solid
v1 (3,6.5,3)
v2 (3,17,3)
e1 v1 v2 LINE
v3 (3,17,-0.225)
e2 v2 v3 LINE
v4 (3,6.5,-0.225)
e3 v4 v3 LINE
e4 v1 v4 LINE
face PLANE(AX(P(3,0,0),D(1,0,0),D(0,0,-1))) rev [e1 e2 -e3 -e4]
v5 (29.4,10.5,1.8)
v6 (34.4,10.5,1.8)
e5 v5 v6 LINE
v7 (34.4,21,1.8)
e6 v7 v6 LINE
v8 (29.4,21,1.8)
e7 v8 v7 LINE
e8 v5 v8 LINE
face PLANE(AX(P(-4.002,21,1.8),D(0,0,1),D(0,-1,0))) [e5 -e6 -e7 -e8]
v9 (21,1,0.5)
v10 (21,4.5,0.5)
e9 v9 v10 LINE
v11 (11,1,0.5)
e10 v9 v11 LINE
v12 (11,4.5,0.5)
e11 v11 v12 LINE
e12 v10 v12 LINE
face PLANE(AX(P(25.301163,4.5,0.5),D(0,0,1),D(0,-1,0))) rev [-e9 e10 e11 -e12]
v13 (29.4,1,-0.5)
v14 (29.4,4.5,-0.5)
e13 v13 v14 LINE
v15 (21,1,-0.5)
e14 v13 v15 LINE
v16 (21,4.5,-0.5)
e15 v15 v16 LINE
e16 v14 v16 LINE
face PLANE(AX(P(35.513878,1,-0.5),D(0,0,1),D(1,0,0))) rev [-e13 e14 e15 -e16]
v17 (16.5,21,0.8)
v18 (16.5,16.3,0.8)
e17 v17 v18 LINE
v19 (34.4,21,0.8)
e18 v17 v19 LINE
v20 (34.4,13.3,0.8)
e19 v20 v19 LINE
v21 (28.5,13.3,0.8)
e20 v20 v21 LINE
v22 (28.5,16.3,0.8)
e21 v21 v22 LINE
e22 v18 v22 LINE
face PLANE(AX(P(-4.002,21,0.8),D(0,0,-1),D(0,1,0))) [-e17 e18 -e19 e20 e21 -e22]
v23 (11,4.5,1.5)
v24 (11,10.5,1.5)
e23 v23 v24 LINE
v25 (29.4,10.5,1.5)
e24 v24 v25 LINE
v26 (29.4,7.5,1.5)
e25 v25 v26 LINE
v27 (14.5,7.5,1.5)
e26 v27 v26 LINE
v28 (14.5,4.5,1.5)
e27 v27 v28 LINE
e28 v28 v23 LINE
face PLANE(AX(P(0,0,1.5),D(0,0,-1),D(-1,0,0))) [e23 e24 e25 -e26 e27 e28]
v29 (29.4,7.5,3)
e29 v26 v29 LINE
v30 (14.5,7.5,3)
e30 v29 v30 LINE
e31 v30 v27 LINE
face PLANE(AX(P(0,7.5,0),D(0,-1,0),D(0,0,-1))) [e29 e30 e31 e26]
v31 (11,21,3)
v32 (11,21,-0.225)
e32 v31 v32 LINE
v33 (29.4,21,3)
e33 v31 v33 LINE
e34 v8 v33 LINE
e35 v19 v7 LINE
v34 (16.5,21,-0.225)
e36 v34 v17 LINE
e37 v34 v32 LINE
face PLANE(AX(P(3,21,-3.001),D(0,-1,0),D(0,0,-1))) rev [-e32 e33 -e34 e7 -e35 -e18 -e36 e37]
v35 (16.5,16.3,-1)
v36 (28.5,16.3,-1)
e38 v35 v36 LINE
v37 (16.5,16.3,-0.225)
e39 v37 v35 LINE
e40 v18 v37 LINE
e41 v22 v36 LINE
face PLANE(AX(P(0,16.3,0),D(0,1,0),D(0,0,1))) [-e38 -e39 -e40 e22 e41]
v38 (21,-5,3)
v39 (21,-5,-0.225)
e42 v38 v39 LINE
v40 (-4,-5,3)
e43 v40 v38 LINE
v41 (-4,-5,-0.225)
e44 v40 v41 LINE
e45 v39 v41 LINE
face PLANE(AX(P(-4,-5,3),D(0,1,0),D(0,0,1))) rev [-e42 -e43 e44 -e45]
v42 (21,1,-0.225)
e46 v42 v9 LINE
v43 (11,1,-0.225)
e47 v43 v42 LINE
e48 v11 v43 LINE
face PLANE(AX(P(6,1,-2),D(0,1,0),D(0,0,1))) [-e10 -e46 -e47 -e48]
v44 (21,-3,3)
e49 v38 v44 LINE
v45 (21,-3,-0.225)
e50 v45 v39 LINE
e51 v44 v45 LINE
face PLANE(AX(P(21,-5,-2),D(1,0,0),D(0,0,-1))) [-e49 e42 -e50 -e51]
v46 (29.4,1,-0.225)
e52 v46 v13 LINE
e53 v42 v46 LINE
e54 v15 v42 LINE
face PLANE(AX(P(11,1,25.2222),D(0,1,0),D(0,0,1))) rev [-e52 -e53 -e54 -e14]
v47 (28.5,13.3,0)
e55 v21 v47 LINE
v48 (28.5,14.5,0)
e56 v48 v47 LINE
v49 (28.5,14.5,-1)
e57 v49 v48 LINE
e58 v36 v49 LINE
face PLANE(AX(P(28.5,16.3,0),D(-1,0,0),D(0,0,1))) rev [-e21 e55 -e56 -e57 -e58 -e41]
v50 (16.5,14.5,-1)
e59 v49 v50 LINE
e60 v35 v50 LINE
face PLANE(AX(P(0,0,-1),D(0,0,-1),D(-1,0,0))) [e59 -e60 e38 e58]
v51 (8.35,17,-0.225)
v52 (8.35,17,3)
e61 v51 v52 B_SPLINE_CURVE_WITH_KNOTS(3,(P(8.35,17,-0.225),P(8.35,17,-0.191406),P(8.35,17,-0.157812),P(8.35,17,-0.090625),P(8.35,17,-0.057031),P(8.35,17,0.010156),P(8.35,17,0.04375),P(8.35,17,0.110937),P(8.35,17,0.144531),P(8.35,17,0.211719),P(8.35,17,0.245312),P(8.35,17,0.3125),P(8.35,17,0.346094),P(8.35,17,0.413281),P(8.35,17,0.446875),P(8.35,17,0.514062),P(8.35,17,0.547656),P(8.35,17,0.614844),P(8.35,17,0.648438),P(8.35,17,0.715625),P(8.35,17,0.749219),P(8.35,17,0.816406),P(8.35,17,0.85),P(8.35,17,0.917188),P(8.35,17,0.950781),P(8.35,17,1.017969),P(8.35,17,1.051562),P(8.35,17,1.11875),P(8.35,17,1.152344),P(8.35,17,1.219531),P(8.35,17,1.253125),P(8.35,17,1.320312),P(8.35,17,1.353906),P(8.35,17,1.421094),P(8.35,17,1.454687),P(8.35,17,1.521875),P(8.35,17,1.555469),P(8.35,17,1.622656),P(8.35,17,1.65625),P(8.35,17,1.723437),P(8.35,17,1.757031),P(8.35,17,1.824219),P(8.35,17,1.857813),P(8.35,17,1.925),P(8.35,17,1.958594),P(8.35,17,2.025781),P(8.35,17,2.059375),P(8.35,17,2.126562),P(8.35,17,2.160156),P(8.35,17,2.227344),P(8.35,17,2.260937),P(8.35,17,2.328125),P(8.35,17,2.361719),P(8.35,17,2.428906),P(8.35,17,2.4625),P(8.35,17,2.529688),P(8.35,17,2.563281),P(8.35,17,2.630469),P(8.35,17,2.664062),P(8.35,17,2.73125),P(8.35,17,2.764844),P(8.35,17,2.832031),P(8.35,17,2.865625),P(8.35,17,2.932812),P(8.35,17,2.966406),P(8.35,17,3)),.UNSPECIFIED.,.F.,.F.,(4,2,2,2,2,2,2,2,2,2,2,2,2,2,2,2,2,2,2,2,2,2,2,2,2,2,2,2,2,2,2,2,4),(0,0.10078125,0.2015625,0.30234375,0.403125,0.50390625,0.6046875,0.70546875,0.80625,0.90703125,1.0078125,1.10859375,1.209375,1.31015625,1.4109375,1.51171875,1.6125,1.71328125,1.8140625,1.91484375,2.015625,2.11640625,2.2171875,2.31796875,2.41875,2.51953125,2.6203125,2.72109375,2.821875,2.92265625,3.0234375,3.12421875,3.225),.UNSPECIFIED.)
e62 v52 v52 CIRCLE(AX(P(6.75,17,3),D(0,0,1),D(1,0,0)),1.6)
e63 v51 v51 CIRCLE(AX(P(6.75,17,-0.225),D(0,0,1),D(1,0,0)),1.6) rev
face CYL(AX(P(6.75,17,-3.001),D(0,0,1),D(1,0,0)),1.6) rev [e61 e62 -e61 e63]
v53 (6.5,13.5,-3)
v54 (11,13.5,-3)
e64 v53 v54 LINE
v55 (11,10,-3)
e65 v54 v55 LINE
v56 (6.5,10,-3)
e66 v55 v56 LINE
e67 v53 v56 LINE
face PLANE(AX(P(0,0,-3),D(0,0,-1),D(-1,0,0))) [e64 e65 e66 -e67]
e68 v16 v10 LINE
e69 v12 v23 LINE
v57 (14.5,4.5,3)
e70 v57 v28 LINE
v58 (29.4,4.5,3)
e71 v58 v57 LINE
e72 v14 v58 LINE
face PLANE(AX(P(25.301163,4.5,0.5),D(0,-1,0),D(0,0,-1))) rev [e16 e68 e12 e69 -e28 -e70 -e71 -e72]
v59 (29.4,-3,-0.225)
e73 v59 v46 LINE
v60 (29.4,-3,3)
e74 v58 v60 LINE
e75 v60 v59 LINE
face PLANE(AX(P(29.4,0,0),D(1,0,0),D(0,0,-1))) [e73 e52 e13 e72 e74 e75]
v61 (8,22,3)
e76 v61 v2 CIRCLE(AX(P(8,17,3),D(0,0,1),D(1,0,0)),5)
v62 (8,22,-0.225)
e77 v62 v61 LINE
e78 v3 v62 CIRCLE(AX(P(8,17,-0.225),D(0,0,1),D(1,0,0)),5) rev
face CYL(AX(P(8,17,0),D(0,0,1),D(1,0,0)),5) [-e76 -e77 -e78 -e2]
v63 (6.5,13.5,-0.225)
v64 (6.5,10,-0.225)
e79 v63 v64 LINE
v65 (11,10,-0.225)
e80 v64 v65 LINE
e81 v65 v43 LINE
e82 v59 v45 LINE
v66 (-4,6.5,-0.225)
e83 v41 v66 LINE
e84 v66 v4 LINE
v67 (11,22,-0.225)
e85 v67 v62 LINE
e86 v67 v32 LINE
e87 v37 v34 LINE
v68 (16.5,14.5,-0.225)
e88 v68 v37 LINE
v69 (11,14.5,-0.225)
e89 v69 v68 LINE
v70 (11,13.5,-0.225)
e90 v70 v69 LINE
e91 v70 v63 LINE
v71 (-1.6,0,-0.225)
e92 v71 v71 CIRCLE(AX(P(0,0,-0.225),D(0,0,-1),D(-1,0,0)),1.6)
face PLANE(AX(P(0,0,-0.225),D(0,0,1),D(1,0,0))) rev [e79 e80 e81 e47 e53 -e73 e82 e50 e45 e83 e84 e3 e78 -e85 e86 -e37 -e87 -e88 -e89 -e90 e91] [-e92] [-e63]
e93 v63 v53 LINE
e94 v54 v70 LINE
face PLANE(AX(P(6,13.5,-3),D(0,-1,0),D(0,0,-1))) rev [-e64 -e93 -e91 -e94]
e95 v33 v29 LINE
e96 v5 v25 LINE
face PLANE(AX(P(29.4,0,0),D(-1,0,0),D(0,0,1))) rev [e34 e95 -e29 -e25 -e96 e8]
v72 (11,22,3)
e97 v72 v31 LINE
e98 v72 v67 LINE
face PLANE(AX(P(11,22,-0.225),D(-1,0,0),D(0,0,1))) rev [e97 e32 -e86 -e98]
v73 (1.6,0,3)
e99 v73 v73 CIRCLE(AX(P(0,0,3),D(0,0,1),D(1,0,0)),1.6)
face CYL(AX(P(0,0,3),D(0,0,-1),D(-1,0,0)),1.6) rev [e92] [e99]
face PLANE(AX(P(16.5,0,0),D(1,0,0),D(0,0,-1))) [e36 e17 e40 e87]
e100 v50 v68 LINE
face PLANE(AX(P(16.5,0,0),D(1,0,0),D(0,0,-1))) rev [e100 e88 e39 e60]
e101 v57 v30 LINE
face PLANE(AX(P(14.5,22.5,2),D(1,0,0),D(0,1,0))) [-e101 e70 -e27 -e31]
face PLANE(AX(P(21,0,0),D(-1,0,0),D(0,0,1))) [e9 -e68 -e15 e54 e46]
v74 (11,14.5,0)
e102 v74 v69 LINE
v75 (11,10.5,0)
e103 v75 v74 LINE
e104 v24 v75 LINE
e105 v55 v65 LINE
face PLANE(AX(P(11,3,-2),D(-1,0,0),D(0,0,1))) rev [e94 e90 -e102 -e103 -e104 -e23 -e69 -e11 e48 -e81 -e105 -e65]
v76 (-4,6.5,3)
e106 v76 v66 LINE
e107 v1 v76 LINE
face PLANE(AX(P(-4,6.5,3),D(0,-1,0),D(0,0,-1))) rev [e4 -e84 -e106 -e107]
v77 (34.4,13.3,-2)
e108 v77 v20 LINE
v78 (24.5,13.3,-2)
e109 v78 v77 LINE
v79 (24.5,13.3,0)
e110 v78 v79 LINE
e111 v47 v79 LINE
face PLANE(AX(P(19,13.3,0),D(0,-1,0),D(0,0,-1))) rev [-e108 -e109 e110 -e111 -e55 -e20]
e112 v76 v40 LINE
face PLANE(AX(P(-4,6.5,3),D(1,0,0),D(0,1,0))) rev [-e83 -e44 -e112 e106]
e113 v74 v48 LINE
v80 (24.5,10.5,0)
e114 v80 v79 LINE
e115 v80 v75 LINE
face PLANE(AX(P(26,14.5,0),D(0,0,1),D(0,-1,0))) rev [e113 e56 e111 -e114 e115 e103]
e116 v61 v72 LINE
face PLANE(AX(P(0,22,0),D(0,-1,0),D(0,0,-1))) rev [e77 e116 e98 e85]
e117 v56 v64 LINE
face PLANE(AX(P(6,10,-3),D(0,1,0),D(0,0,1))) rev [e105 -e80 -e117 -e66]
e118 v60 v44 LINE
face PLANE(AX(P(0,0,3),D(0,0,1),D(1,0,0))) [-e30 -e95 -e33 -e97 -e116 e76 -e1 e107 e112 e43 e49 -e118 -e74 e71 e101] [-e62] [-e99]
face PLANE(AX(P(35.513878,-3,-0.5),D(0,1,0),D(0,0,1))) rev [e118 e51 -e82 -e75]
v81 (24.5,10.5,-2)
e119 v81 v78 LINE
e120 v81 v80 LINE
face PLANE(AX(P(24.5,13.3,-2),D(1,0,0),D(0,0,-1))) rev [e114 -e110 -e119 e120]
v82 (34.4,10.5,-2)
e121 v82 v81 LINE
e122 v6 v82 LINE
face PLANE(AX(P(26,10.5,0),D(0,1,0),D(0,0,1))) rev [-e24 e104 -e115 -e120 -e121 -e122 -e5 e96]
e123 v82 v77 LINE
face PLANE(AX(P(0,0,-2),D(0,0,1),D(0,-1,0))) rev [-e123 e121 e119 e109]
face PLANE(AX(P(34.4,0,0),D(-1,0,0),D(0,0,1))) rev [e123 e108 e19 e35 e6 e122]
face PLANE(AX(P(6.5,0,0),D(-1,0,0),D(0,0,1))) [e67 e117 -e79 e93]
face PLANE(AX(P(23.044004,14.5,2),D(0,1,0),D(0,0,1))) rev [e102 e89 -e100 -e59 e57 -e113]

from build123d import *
from build123d.topology import SkipClean

# Parameters (mm, degrees)
SKETCH_1_W           = 10
SKETCH_1_H           = 11.5
SKETCH_1_R           = 1.6
EXTRUDE_1_DEPTH      = 3
SKETCH_2_W           = 15
SKETCH_2_H           = 6
EXTRUDE_2_DEPTH      = 5
FILLET_1_R           = 1
SKETCH_3_W           = 5
SKETCH_3_H           = 5
EXTRUDE_3_DEPTH      = 2
SKETCH_4_W           = 5
SKETCH_4_H           = 3
EXTRUDE_4_DEPTH      = 19.5
SKETCH_5_W           = 5
SKETCH_5_H           = 3.5
EXTRUDE_5_DEPTH      = 3
SKETCH_6_W           = 3
SKETCH_6_H           = 8.5
EXTRUDE_6_DEPTH      = 3
EXTRUDE_7_DEPTH      = 1
SKETCH_8_W           = 3.5
SKETCH_8_H           = 21.5
EXTRUDE_8_DEPTH      = 1
SKETCH_9_W           = 3
SKETCH_9_H           = 8
EXTRUDE_9_DEPTH      = 3.5
EXTRUDE_10_REACH     = 29.208
SKETCH_10_W          = 2.5
SKETCH_10_H          = 3.5
EXTRUDE_11_REACH     = 29.208
SKETCH_11_W          = 3
SKETCH_11_H          = 4
SKETCH_12_W          = 1.5
SKETCH_12_H          = 1.2
CUT_EXTRUDE_1_DEPTH  = 2
SKETCH_13_W          = 1
SKETCH_13_H          = 2.5
EXTRUDE_12_DEPTH     = 6.5
SKETCH_14_W          = 1.2
SKETCH_14_H          = 8
EXTRUDE_13_DEPTH     = 6.5
SKETCH_15_W          = 4
SKETCH_15_H          = 4
EXTRUDE_14_DEPTH     = 2.8
FILLET_2_R           = 1
CUT_EXTRUDE_2_REACH  = 33.357
SKETCH_16_R          = 1.6
SKETCH_17_W          = 15
SKETCH_17_H          = 5
EXTRUDE_15_DEPTH     = 2
EXTRUDE_16_DEPTH     = 5.5
SKETCH_19_W          = 2
SKETCH_19_H          = 2.8
EXTRUDE_17_DEPTH     = 2
EXTRUDE_18_DEPTH     = 5.5
EXTRUDE_19_DEPTH     = 2.9
EXTRUDE_20_DEPTH     = 0.5
SKETCH_23_W          = 14.9
SKETCH_23_H          = 1.5
EXTRUDE_21_DEPTH     = 0.5
SKETCH_24_W          = 3
SKETCH_24_H          = 2.8
EXTRUDE_22_DEPTH     = 5
EXTRUDE_23_DEPTH     = 3.2
SKETCH_26_W          = 10
SKETCH_26_H          = 1.8
EXTRUDE_24_DEPTH     = 3
SKETCH_27_W          = 10
SKETCH_27_H          = 1.8
EXTRUDE_25_DEPTH     = 1
SKETCH_28_W          = 11.5
SKETCH_28_H          = 12.2
CUT_EXTRUDE_3_DEPTH  = 0.775
CUT_EXTRUDE_4_DEPTH  = 0.5
SKETCH_30_W          = 3
SKETCH_30_H          = 7.5
EXTRUDE_26_DEPTH     = 3.5
EXTRUDE_START        = 0.225
SKETCH_31_R          = 1.6
EXTRUDE_27_DEPTH     = 0.225
CUT_EXTRUDE_5_DEPTH  = 1.775
SKETCH_33_W          = 4
SKETCH_33_H          = 3.2
CUT_EXTRUDE_6_DEPTH  = 2.8
SKETCH_34_W          = 2.025
SKETCH_34_H          = 9.4
EXTRUDE_28_DEPTH     = 2
SKETCH_35_W          = 0.775
SKETCH_35_H          = 1.8
CUT_EXTRUDE_7_DEPTH  = 2
CUT_EXTRUDE_8_REACH  = 45.061
SKETCH_36_W          = 19.5
SKETCH_36_H          = 3.2
CUT_EXTRUDE_9_REACH  = 38.357
SKETCH_37_W          = 3.225
SKETCH_37_H          = 2
CUT_EXTRUDE_10_REACH = 43.54
SKETCH_39_W          = 26.4
SKETCH_39_H          = 1.5
SKETCH_40_W          = 1
SKETCH_40_H          = 3.225
EXTRUDE_29_DEPTH     = 11.5
EXTRUDE_30_REACH     = 45.87
SKETCH_41_W          = 1
SKETCH_41_H          = 10.5
SKETCH_42_W          = 1
SKETCH_42_H          = 7.5
EXTRUDE_31_DEPTH     = 3
SKETCH_43_W          = 8
SKETCH_43_H          = 3.225
EXTRUDE_32_DEPTH     = 1
CUT_EXTRUDE_11_REACH = 43.007
SKETCH_44_W          = 3
SKETCH_44_H          = 7.5
FILLET_3_R           = 5


with BuildPart() as part:
    # 草图1 → 凸台-拉伸1 (new body)
    with BuildSketch(Plane.XY):
        with Locations((1, 0.75)):
            Rectangle(SKETCH_1_W, SKETCH_1_H)
        Circle(SKETCH_1_R, mode=Mode.SUBTRACT)
    extrude(amount=EXTRUDE_1_DEPTH)

    # 草图2 → 凸台-拉伸2 (add)
    with BuildSketch(Plane.XY.offset(3)):
        with Locations((13.5, -2)):
            Rectangle(SKETCH_2_W, SKETCH_2_H)
    extrude(amount=-EXTRUDE_2_DEPTH)

    # 圆角1
    fillet_1_edges = [part.edges().sort_by_distance(p)[0] for p in [
        (-4, 0.75, 0),
    ]]
    fillet(fillet_1_edges, radius=FILLET_1_R)

    # 草图3 → 凸台-拉伸3 (add)
    with BuildSketch(Plane(origin=(0, 1, 0), x_dir=(1, 0, 0), z_dir=(0, 1, 0))):
        with Locations((8.5, -0.5)):
            Rectangle(SKETCH_3_W, SKETCH_3_H)
    extrude(amount=EXTRUDE_3_DEPTH)

    # 草图4 → 凸台-拉伸4 (add)
    with BuildSketch(Plane(origin=(0, 3, 0), x_dir=(1, 0, 0), z_dir=(0, 1, 0))):
        with Locations((8.5, -1.5)):
            Rectangle(SKETCH_4_W, SKETCH_4_H)
    extrude(amount=EXTRUDE_4_DEPTH)

    # 草图5 → 凸台-拉伸5 (add)
    with BuildSketch(Plane(origin=(0, 0, 0), x_dir=(-1, 0, 0), z_dir=(0, 0, -1))):
        with Locations((-8.5, 11.75)):
            Rectangle(SKETCH_5_W, SKETCH_5_H)
    extrude(amount=EXTRUDE_5_DEPTH)

    # 草图6 → 凸台-拉伸6 (add)
    with BuildSketch(Plane.ZY.offset(-6)):
        with Locations((1.5, 18.25)):
            Rectangle(SKETCH_6_W, SKETCH_6_H)
    extrude(amount=EXTRUDE_6_DEPTH)

    # 草图7 → 凸台-拉伸7 (add)
    with BuildSketch(Plane(origin=(0, 0, 0), x_dir=(-1, 0, 0), z_dir=(0, 0, -1))):
        Polygon((-11, 13.5), (-6, 13.5), (-6, 14), (-3, 14), (-3, 22.5), (-11, 22.5), align=None)
    extrude(amount=EXTRUDE_7_DEPTH)

    # 草图8 → 凸台-拉伸8 (add)
    with BuildSketch(Plane.XY.offset(3)):
        with Locations((12.75, 11.75)):
            Rectangle(SKETCH_8_W, SKETCH_8_H)
    extrude(amount=-EXTRUDE_8_DEPTH)

    # 草图9 → 凸台-拉伸9 (add)
    with BuildSketch(Plane(origin=(11, 0, 0), x_dir=(0, 0, -1), z_dir=(1, 0, 0))):
        with Locations((-0.5, 18.5)):
            Rectangle(SKETCH_9_W, SKETCH_9_H)
    extrude(amount=EXTRUDE_9_DEPTH)

    # 凸台-拉伸10: up to this face of the body (flat: up to its plane)
    extrude_10_end = Plane(part.part.faces().sort_by_distance((21, -2, 0.5))[0])
    # 草图10 → 凸台-拉伸10 (add, up to the picked face)
    with BuildSketch(Plane(origin=(11, 0, 0), x_dir=(0, 0, -1), z_dir=(1, 0, 0)), mode=Mode.PRIVATE) as extrude_10_sk1:
        with Locations((-1.75, 2.75)):
            Rectangle(SKETCH_10_W, SKETCH_10_H)
    extrude_10_tool1 = split(extrude(extrude_10_sk1.sketch, amount=EXTRUDE_10_REACH, mode=Mode.PRIVATE), bisect_by=extrude_10_end, keep=Keep.BOTH, mode=Mode.PRIVATE)
    add(extrude_10_tool1.solids().sort_by(Axis((11, 2.75, 1.75), (1, 0, 0)))[0])

    # 凸台-拉伸11: up to this face of the body (flat: up to its plane)
    extrude_11_end = Plane(part.part.faces().sort_by_distance((21, -0.927419355, 0.782258065))[0])
    # 草图11 → 凸台-拉伸11 (add, up to the picked face)
    with BuildSketch(Plane(origin=(11, 0, 0), x_dir=(0, 0, -1), z_dir=(1, 0, 0)), mode=Mode.PRIVATE) as extrude_11_sk1:
        with Locations((-1.5, 12.5)):
            Rectangle(SKETCH_11_W, SKETCH_11_H)
    extrude_11_tool1 = split(extrude(extrude_11_sk1.sketch, amount=EXTRUDE_11_REACH, mode=Mode.PRIVATE), bisect_by=extrude_11_end, keep=Keep.BOTH, mode=Mode.PRIVATE)
    add(extrude_11_tool1.solids().sort_by(Axis((11, 12.5, 1.5), (1, 0, 0)))[0])

    # 草图12 → 切除-拉伸1 (cut)
    with BuildSketch(Plane(origin=(21, 0, 0), x_dir=(0, 0, -1), z_dir=(1, 0, 0))):
        with Locations((-0.75, 13.9)):
            Rectangle(SKETCH_12_W, SKETCH_12_H)
    extrude(amount=-CUT_EXTRUDE_1_DEPTH, mode=Mode.SUBTRACT)

    # 草图13 → 凸台-拉伸12 (add)
    with BuildSketch(Plane(origin=(14.5, 0, 0), x_dir=(0, 0, -1), z_dir=(1, 0, 0))):
        with Locations((-2.5, 9.25)):
            Rectangle(SKETCH_13_W, SKETCH_13_H)
    extrude(amount=EXTRUDE_12_DEPTH)

    # 草图14 → 凸台-拉伸13 (add)
    with BuildSketch(Plane(origin=(14.5, 0, 0), x_dir=(0, 0, -1), z_dir=(1, 0, 0))):
        with Locations((-2.4, 18.5)):
            Rectangle(SKETCH_14_W, SKETCH_14_H)
    extrude(amount=EXTRUDE_13_DEPTH)

    # 草图15 → 凸台-拉伸14 (add)
    with BuildSketch(Plane(origin=(0, 0, 1.8), x_dir=(-1, 0, 0), z_dir=(0, 0, -1))):
        with Locations((-16.5, 16.5)):
            Rectangle(SKETCH_15_W, SKETCH_15_H)
    extrude(amount=EXTRUDE_14_DEPTH)

    # 圆角2
    fillet_2_edges = [part.edges().sort_by_distance(p)[0] for p in [
        (14.5, 18.5, 0.4),
    ]]
    fillet(fillet_2_edges, radius=FILLET_2_R)

    # 草图16 → 切除-拉伸2 (cut, up to next)
    with BuildSketch(Plane.XY.offset(3), mode=Mode.PRIVATE) as cut_extrude_2_sk1:
        with Locations((6.75, 17)):
            Circle(SKETCH_16_R)
    cut_extrude_2_tool1 = extrude(cut_extrude_2_sk1.sketch, amount=-CUT_EXTRUDE_2_REACH, mode=Mode.PRIVATE) & part.part
    add(cut_extrude_2_tool1.solids().sort_by_distance((6.75, 17, 3))[0], mode=Mode.SUBTRACT)

    # 草图17 → 凸台-拉伸15 (add)
    with BuildSketch(Plane.XZ.offset(5)):
        with Locations((13.5, 0.5)):
            Rectangle(SKETCH_17_W, SKETCH_17_H)
    extrude(amount=EXTRUDE_15_DEPTH)

    # 草图18 → 凸台-拉伸16 (add)
    with BuildSketch(Plane(origin=(21, 0, 0), x_dir=(0, 0, -1), z_dir=(1, 0, 0))):
        Polygon((0, 13.3), (-1.5, 13.3), (-1.5, 14.5), (-1.8, 14.5), (-1.8, 22.5), (-3, 22.5), (-3, 8), (-2, 8), (-2, 10.5), (0, 10.5), align=None)
    extrude(amount=EXTRUDE_16_DEPTH)

    # 草图19 → 凸台-拉伸17 (add)
    with BuildSketch(Plane(origin=(0, 0, 0), x_dir=(-1, 0, 0), z_dir=(0, 0, -1))):
        with Locations((-25.5, 11.9)):
            Rectangle(SKETCH_19_W, SKETCH_19_H)
    extrude(amount=EXTRUDE_17_DEPTH)

    # 草图20 → 凸台-拉伸18 (add)
    with BuildSketch(Plane(origin=(21, 0, 0), x_dir=(0, 0, -1), z_dir=(1, 0, 0))):
        Polygon((0.5, -3), (-3, -3), (-3, 4.5), (0.5, 4.5), (0.5, 1), (2, 1), (2, -3), align=None)
    extrude(amount=EXTRUDE_18_DEPTH)

    # 草图21 → 凸台-拉伸19 (add)
    with BuildSketch(Plane(origin=(26.5, 0, 0), x_dir=(0, 0, -1), z_dir=(1, 0, 0))):
        Polygon((-3, -3), (2, -3), (2, 1), (0.5, 1), (0.5, 4.5), (-3, 4.5), align=None)
        Polygon((-2, 10.5), (2, 10.5), (2, 13.3), (-1.5, 13.3), (-1.5, 14.5), (-1.8, 14.5), (-1.8, 22.5), (-3, 22.5), (-3, 8), (-2, 8), align=None)
    extrude(amount=EXTRUDE_19_DEPTH)

    # 草图22 → 凸台-拉伸20 (add)
    with BuildSketch(Plane(origin=(0, 0, 2), x_dir=(-1, 0, 0), z_dir=(0, 0, -1))):
        Polygon((-11, 10.5), (-29.4, 10.5), (-29.4, 8), (-14.5, 8), (-14.5, 4.5), (-11, 4.5), align=None)
    extrude(amount=EXTRUDE_20_DEPTH)

    # 草图23 → 凸台-拉伸21 (add)
    with BuildSketch(Plane.XZ.offset(-8)):
        with Locations((21.95, 2.25)):
            Rectangle(SKETCH_23_W, SKETCH_23_H)
    extrude(amount=EXTRUDE_21_DEPTH)

    # 草图24 → 凸台-拉伸22 (add)
    with BuildSketch(Plane(origin=(29.4, 0, 0), x_dir=(0, 0, -1), z_dir=(1, 0, 0))):
        with Locations((0.5, 11.9)):
            Rectangle(SKETCH_24_W, SKETCH_24_H)
    extrude(amount=EXTRUDE_22_DEPTH)

    # 草图25 → 凸台-拉伸23 (add)
    with BuildSketch(Plane(origin=(0, 22.5, 0), x_dir=(1, 0, 0), z_dir=(0, 1, 0))):
        Polygon((9.9, 1), (9.9, -3), (29.4, -3), (29.4, -1.8), (14.5, -1.8), (14.5, 1), align=None)
    extrude(amount=EXTRUDE_23_DEPTH)

    # 草图26 → 凸台-拉伸24 (add)
    with BuildSketch(Plane(origin=(0, 13.3, 0), x_dir=(1, 0, 0), z_dir=(0, 1, 0))):
        with Locations((23.5, -0.9)):
            Rectangle(SKETCH_26_W, SKETCH_26_H)
    extrude(amount=EXTRUDE_24_DEPTH)

    # 草图27 → 凸台-拉伸25 (add)
    with BuildSketch(Plane(origin=(0, 0, 0), x_dir=(-1, 0, 0), z_dir=(0, 0, -1))):
        with Locations((-23.5, 15.4)):
            Rectangle(SKETCH_27_W, SKETCH_27_H)
    extrude(amount=EXTRUDE_25_DEPTH)

    # 草图28 → 切除-拉伸3 (cut)
    with BuildSketch(Plane(origin=(0, 0, -1), x_dir=(-1, 0, 0), z_dir=(0, 0, -1))):
        with Locations((-8.75, 19.6)):
            Rectangle(SKETCH_28_W, SKETCH_28_H)
    extrude(amount=-CUT_EXTRUDE_3_DEPTH, mode=Mode.SUBTRACT)

    # 草图29 → 切除-拉伸4 (cut)
    with BuildSketch(Plane.ZY.offset(-6)):
        Polygon((3, 14), (-0.225, 14), (-0.225, 13.5), (-3, 13.5), (-3, 10), (0, 10), (0, 6.5), (3, 6.5), align=None)
    extrude(amount=-CUT_EXTRUDE_4_DEPTH, mode=Mode.SUBTRACT)

    # 草图30 → 凸台-拉伸26 (add)
    with BuildSketch(Plane.ZY.offset(-6.5)):
        with Locations((1.5, 10.25)):
            Rectangle(SKETCH_30_W, SKETCH_30_H)
    extrude(amount=EXTRUDE_26_DEPTH)

    # 草图31 → 凸台-拉伸27 (add)
    with SkipClean():  # the faces are left unmerged after this step: merging them gives an invalid solid
        with BuildSketch(Plane(origin=(0, 0, 0), x_dir=(-1, 0, 0), z_dir=(0, 0, -1)).offset(EXTRUDE_START)):
            Polygon((3, 6.5), (-3, 6.5), (-3, 14), (-6.5, 14), (-6.5, 10), (-11, 10), (-11, 3), (-6, 3), (-6, -5), (3, -5), align=None)
            Circle(SKETCH_31_R, mode=Mode.SUBTRACT)
        extrude(amount=-EXTRUDE_27_DEPTH)

    # 草图32 → 切除-拉伸5 (cut)
    with SkipClean():  # the faces are left unmerged after this step: merging them gives an invalid solid
        with BuildSketch(Plane(origin=(0, 0, -2), x_dir=(-1, 0, 0), z_dir=(0, 0, -1))):
            Polygon((-6, -7), (-6, 3), (-11, 3), (-11, 1), (-29.4, 1), (-29.4, -3), (-21, -3), (-21, -7), align=None)
        extrude(amount=-CUT_EXTRUDE_5_DEPTH, mode=Mode.SUBTRACT)

    # 草图33 → 切除-拉伸6 (cut)
    with SkipClean():  # the faces are left unmerged after this step: merging them gives an invalid solid
        with BuildSketch(Plane(origin=(0, 0, 1.8), x_dir=(-1, 0, 0), z_dir=(0, 0, -1))):
            with Locations((-16.5, 17.9)):
                Rectangle(SKETCH_33_W, SKETCH_33_H)
        extrude(amount=CUT_EXTRUDE_6_DEPTH, mode=Mode.SUBTRACT)

    # 草图34 → 凸台-拉伸28 (add)
    with SkipClean():  # the faces are left unmerged after this step: merging them gives an invalid solid
        with BuildSketch(Plane(origin=(14.5, 0, 0), x_dir=(0, 0, -1), z_dir=(1, 0, 0))):
            with Locations((-0.7875, 21)):
                Rectangle(SKETCH_34_W, SKETCH_34_H)
        extrude(amount=EXTRUDE_28_DEPTH)

    # 草图35 → 切除-拉伸7 (cut)
    with SkipClean():  # the faces are left unmerged after this step: merging them gives an invalid solid
        with BuildSketch(Plane.ZY.offset(-14.5)):
            with Locations((-0.6125, 15.4)):
                Rectangle(SKETCH_35_W, SKETCH_35_H)
        extrude(amount=-CUT_EXTRUDE_7_DEPTH, mode=Mode.SUBTRACT)

    # 草图36 → 切除-拉伸8 (cut, up to next)
    with BuildSketch(Plane(origin=(0, 0, -0.225), x_dir=(-1, 0, 0), z_dir=(0, 0, -1)), mode=Mode.PRIVATE) as cut_extrude_8_sk1:
        with Locations((-19.65, 24.1)):
            Rectangle(SKETCH_36_W, SKETCH_36_H)
    cut_extrude_8_tool1 = extrude(cut_extrude_8_sk1.sketch, amount=-CUT_EXTRUDE_8_REACH, mode=Mode.PRIVATE) & part.part
    add(cut_extrude_8_tool1.solids().sort_by_distance((19.65, 24.1, -0.225))[0], mode=Mode.SUBTRACT)

    # 草图37 → 切除-拉伸9 (cut, up to next)
    with BuildSketch(Plane.ZY.offset(-6), mode=Mode.PRIVATE) as cut_extrude_9_sk1:
        with Locations((1.3875, -6)):
            Rectangle(SKETCH_37_W, SKETCH_37_H)
    cut_extrude_9_tool1 = extrude(cut_extrude_9_sk1.sketch, amount=-CUT_EXTRUDE_9_REACH, mode=Mode.PRIVATE) & part.part
    add(cut_extrude_9_tool1.solids().sort_by_distance((6, -6, 1.3875))[0], mode=Mode.SUBTRACT)

    # 草图39 → 切除-拉伸10 (cut, up to next)
    with BuildSketch(Plane.XY.offset(3), mode=Mode.PRIVATE) as cut_extrude_10_sk1:
        with Locations((16.2, 21.75)):
            Rectangle(SKETCH_39_W, SKETCH_39_H)
    cut_extrude_10_tool1 = extrude(cut_extrude_10_sk1.sketch, amount=-CUT_EXTRUDE_10_REACH, mode=Mode.PRIVATE) & part.part
    add(cut_extrude_10_tool1.solids().sort_by_distance((16.2, 21.75, 3))[0], mode=Mode.SUBTRACT)

    # 草图40 → 凸台-拉伸29 (add)
    with SkipClean():  # the faces are left unmerged after this step: merging them gives an invalid solid
        with BuildSketch(Plane(origin=(0, 6.5, 0), x_dir=(1, 0, 0), z_dir=(0, 1, 0))):
            with Locations((-3.5, -1.3875)):
                Rectangle(SKETCH_40_W, SKETCH_40_H)
        extrude(amount=-EXTRUDE_29_DEPTH)

    # 草图41 → 凸台-拉伸30 (add, up to next)
    with BuildSketch(Plane(origin=(34.4, 0, 0), x_dir=(0, 0, -1), z_dir=(1, 0, 0)), mode=Mode.PRIVATE) as extrude_30_sk1:
        with Locations((-1.3, 15.75)):
            Rectangle(SKETCH_41_W, SKETCH_41_H)
    extrude_30_tool1 = extrude(extrude_30_sk1.sketch, amount=-EXTRUDE_30_REACH, mode=Mode.PRIVATE) - part.part
    add(extrude_30_tool1.solids().sort_by_distance((34.4, 15.75, 1.3))[0])

    # 草图42 → 凸台-拉伸31 (add)
    with SkipClean():  # the faces are left unmerged after this step: merging them gives an invalid solid
        with BuildSketch(Plane(origin=(29.4, 0, 0), x_dir=(0, 0, -1), z_dir=(1, 0, 0))):
            with Locations((-0.275, 0.75)):
                Rectangle(SKETCH_42_W, SKETCH_42_H)
        extrude(amount=EXTRUDE_31_DEPTH)

    # 草图43 → 凸台-拉伸32 (add)
    with SkipClean():  # the faces are left unmerged after this step: merging them gives an invalid solid
        with BuildSketch(Plane(origin=(0, 21, 0), x_dir=(1, 0, 0), z_dir=(0, 1, 0))):
            with Locations((7, -1.3875)):
                Rectangle(SKETCH_43_W, SKETCH_43_H)
        extrude(amount=EXTRUDE_32_DEPTH)

    # 草图44 → 切除-拉伸11 (cut, up to next)
    with BuildSketch(Plane.XY.offset(0.775), mode=Mode.PRIVATE) as cut_extrude_11_sk1:
        with Locations((30.9, 0.75)):
            Rectangle(SKETCH_44_W, SKETCH_44_H)
    cut_extrude_11_tool1 = extrude(cut_extrude_11_sk1.sketch, amount=-CUT_EXTRUDE_11_REACH, mode=Mode.PRIVATE) & part.part
    add(cut_extrude_11_tool1.solids().sort_by_distance((30.9, 0.75, 0.775))[0], mode=Mode.SUBTRACT)

    # 圆角3
    # the kernel refuses this fillet: 5 mm, written as the material it takes off along each edge
    with BuildSketch(Plane(origin=(3, 22, -12.725), x_dir=(1, 0, 0), z_dir=(0, 0, 1))) as fillet_3_piece_1:
        with BuildLine():
            CenterArc((FILLET_3_R, -FILLET_3_R), FILLET_3_R, 90, 90)
            Line((0, -FILLET_3_R), (0, 0))
            Line((0, 0), (FILLET_3_R, 0))
        make_face()
    extrude(amount=28.225, mode=Mode.SUBTRACT)


solid = part.part
